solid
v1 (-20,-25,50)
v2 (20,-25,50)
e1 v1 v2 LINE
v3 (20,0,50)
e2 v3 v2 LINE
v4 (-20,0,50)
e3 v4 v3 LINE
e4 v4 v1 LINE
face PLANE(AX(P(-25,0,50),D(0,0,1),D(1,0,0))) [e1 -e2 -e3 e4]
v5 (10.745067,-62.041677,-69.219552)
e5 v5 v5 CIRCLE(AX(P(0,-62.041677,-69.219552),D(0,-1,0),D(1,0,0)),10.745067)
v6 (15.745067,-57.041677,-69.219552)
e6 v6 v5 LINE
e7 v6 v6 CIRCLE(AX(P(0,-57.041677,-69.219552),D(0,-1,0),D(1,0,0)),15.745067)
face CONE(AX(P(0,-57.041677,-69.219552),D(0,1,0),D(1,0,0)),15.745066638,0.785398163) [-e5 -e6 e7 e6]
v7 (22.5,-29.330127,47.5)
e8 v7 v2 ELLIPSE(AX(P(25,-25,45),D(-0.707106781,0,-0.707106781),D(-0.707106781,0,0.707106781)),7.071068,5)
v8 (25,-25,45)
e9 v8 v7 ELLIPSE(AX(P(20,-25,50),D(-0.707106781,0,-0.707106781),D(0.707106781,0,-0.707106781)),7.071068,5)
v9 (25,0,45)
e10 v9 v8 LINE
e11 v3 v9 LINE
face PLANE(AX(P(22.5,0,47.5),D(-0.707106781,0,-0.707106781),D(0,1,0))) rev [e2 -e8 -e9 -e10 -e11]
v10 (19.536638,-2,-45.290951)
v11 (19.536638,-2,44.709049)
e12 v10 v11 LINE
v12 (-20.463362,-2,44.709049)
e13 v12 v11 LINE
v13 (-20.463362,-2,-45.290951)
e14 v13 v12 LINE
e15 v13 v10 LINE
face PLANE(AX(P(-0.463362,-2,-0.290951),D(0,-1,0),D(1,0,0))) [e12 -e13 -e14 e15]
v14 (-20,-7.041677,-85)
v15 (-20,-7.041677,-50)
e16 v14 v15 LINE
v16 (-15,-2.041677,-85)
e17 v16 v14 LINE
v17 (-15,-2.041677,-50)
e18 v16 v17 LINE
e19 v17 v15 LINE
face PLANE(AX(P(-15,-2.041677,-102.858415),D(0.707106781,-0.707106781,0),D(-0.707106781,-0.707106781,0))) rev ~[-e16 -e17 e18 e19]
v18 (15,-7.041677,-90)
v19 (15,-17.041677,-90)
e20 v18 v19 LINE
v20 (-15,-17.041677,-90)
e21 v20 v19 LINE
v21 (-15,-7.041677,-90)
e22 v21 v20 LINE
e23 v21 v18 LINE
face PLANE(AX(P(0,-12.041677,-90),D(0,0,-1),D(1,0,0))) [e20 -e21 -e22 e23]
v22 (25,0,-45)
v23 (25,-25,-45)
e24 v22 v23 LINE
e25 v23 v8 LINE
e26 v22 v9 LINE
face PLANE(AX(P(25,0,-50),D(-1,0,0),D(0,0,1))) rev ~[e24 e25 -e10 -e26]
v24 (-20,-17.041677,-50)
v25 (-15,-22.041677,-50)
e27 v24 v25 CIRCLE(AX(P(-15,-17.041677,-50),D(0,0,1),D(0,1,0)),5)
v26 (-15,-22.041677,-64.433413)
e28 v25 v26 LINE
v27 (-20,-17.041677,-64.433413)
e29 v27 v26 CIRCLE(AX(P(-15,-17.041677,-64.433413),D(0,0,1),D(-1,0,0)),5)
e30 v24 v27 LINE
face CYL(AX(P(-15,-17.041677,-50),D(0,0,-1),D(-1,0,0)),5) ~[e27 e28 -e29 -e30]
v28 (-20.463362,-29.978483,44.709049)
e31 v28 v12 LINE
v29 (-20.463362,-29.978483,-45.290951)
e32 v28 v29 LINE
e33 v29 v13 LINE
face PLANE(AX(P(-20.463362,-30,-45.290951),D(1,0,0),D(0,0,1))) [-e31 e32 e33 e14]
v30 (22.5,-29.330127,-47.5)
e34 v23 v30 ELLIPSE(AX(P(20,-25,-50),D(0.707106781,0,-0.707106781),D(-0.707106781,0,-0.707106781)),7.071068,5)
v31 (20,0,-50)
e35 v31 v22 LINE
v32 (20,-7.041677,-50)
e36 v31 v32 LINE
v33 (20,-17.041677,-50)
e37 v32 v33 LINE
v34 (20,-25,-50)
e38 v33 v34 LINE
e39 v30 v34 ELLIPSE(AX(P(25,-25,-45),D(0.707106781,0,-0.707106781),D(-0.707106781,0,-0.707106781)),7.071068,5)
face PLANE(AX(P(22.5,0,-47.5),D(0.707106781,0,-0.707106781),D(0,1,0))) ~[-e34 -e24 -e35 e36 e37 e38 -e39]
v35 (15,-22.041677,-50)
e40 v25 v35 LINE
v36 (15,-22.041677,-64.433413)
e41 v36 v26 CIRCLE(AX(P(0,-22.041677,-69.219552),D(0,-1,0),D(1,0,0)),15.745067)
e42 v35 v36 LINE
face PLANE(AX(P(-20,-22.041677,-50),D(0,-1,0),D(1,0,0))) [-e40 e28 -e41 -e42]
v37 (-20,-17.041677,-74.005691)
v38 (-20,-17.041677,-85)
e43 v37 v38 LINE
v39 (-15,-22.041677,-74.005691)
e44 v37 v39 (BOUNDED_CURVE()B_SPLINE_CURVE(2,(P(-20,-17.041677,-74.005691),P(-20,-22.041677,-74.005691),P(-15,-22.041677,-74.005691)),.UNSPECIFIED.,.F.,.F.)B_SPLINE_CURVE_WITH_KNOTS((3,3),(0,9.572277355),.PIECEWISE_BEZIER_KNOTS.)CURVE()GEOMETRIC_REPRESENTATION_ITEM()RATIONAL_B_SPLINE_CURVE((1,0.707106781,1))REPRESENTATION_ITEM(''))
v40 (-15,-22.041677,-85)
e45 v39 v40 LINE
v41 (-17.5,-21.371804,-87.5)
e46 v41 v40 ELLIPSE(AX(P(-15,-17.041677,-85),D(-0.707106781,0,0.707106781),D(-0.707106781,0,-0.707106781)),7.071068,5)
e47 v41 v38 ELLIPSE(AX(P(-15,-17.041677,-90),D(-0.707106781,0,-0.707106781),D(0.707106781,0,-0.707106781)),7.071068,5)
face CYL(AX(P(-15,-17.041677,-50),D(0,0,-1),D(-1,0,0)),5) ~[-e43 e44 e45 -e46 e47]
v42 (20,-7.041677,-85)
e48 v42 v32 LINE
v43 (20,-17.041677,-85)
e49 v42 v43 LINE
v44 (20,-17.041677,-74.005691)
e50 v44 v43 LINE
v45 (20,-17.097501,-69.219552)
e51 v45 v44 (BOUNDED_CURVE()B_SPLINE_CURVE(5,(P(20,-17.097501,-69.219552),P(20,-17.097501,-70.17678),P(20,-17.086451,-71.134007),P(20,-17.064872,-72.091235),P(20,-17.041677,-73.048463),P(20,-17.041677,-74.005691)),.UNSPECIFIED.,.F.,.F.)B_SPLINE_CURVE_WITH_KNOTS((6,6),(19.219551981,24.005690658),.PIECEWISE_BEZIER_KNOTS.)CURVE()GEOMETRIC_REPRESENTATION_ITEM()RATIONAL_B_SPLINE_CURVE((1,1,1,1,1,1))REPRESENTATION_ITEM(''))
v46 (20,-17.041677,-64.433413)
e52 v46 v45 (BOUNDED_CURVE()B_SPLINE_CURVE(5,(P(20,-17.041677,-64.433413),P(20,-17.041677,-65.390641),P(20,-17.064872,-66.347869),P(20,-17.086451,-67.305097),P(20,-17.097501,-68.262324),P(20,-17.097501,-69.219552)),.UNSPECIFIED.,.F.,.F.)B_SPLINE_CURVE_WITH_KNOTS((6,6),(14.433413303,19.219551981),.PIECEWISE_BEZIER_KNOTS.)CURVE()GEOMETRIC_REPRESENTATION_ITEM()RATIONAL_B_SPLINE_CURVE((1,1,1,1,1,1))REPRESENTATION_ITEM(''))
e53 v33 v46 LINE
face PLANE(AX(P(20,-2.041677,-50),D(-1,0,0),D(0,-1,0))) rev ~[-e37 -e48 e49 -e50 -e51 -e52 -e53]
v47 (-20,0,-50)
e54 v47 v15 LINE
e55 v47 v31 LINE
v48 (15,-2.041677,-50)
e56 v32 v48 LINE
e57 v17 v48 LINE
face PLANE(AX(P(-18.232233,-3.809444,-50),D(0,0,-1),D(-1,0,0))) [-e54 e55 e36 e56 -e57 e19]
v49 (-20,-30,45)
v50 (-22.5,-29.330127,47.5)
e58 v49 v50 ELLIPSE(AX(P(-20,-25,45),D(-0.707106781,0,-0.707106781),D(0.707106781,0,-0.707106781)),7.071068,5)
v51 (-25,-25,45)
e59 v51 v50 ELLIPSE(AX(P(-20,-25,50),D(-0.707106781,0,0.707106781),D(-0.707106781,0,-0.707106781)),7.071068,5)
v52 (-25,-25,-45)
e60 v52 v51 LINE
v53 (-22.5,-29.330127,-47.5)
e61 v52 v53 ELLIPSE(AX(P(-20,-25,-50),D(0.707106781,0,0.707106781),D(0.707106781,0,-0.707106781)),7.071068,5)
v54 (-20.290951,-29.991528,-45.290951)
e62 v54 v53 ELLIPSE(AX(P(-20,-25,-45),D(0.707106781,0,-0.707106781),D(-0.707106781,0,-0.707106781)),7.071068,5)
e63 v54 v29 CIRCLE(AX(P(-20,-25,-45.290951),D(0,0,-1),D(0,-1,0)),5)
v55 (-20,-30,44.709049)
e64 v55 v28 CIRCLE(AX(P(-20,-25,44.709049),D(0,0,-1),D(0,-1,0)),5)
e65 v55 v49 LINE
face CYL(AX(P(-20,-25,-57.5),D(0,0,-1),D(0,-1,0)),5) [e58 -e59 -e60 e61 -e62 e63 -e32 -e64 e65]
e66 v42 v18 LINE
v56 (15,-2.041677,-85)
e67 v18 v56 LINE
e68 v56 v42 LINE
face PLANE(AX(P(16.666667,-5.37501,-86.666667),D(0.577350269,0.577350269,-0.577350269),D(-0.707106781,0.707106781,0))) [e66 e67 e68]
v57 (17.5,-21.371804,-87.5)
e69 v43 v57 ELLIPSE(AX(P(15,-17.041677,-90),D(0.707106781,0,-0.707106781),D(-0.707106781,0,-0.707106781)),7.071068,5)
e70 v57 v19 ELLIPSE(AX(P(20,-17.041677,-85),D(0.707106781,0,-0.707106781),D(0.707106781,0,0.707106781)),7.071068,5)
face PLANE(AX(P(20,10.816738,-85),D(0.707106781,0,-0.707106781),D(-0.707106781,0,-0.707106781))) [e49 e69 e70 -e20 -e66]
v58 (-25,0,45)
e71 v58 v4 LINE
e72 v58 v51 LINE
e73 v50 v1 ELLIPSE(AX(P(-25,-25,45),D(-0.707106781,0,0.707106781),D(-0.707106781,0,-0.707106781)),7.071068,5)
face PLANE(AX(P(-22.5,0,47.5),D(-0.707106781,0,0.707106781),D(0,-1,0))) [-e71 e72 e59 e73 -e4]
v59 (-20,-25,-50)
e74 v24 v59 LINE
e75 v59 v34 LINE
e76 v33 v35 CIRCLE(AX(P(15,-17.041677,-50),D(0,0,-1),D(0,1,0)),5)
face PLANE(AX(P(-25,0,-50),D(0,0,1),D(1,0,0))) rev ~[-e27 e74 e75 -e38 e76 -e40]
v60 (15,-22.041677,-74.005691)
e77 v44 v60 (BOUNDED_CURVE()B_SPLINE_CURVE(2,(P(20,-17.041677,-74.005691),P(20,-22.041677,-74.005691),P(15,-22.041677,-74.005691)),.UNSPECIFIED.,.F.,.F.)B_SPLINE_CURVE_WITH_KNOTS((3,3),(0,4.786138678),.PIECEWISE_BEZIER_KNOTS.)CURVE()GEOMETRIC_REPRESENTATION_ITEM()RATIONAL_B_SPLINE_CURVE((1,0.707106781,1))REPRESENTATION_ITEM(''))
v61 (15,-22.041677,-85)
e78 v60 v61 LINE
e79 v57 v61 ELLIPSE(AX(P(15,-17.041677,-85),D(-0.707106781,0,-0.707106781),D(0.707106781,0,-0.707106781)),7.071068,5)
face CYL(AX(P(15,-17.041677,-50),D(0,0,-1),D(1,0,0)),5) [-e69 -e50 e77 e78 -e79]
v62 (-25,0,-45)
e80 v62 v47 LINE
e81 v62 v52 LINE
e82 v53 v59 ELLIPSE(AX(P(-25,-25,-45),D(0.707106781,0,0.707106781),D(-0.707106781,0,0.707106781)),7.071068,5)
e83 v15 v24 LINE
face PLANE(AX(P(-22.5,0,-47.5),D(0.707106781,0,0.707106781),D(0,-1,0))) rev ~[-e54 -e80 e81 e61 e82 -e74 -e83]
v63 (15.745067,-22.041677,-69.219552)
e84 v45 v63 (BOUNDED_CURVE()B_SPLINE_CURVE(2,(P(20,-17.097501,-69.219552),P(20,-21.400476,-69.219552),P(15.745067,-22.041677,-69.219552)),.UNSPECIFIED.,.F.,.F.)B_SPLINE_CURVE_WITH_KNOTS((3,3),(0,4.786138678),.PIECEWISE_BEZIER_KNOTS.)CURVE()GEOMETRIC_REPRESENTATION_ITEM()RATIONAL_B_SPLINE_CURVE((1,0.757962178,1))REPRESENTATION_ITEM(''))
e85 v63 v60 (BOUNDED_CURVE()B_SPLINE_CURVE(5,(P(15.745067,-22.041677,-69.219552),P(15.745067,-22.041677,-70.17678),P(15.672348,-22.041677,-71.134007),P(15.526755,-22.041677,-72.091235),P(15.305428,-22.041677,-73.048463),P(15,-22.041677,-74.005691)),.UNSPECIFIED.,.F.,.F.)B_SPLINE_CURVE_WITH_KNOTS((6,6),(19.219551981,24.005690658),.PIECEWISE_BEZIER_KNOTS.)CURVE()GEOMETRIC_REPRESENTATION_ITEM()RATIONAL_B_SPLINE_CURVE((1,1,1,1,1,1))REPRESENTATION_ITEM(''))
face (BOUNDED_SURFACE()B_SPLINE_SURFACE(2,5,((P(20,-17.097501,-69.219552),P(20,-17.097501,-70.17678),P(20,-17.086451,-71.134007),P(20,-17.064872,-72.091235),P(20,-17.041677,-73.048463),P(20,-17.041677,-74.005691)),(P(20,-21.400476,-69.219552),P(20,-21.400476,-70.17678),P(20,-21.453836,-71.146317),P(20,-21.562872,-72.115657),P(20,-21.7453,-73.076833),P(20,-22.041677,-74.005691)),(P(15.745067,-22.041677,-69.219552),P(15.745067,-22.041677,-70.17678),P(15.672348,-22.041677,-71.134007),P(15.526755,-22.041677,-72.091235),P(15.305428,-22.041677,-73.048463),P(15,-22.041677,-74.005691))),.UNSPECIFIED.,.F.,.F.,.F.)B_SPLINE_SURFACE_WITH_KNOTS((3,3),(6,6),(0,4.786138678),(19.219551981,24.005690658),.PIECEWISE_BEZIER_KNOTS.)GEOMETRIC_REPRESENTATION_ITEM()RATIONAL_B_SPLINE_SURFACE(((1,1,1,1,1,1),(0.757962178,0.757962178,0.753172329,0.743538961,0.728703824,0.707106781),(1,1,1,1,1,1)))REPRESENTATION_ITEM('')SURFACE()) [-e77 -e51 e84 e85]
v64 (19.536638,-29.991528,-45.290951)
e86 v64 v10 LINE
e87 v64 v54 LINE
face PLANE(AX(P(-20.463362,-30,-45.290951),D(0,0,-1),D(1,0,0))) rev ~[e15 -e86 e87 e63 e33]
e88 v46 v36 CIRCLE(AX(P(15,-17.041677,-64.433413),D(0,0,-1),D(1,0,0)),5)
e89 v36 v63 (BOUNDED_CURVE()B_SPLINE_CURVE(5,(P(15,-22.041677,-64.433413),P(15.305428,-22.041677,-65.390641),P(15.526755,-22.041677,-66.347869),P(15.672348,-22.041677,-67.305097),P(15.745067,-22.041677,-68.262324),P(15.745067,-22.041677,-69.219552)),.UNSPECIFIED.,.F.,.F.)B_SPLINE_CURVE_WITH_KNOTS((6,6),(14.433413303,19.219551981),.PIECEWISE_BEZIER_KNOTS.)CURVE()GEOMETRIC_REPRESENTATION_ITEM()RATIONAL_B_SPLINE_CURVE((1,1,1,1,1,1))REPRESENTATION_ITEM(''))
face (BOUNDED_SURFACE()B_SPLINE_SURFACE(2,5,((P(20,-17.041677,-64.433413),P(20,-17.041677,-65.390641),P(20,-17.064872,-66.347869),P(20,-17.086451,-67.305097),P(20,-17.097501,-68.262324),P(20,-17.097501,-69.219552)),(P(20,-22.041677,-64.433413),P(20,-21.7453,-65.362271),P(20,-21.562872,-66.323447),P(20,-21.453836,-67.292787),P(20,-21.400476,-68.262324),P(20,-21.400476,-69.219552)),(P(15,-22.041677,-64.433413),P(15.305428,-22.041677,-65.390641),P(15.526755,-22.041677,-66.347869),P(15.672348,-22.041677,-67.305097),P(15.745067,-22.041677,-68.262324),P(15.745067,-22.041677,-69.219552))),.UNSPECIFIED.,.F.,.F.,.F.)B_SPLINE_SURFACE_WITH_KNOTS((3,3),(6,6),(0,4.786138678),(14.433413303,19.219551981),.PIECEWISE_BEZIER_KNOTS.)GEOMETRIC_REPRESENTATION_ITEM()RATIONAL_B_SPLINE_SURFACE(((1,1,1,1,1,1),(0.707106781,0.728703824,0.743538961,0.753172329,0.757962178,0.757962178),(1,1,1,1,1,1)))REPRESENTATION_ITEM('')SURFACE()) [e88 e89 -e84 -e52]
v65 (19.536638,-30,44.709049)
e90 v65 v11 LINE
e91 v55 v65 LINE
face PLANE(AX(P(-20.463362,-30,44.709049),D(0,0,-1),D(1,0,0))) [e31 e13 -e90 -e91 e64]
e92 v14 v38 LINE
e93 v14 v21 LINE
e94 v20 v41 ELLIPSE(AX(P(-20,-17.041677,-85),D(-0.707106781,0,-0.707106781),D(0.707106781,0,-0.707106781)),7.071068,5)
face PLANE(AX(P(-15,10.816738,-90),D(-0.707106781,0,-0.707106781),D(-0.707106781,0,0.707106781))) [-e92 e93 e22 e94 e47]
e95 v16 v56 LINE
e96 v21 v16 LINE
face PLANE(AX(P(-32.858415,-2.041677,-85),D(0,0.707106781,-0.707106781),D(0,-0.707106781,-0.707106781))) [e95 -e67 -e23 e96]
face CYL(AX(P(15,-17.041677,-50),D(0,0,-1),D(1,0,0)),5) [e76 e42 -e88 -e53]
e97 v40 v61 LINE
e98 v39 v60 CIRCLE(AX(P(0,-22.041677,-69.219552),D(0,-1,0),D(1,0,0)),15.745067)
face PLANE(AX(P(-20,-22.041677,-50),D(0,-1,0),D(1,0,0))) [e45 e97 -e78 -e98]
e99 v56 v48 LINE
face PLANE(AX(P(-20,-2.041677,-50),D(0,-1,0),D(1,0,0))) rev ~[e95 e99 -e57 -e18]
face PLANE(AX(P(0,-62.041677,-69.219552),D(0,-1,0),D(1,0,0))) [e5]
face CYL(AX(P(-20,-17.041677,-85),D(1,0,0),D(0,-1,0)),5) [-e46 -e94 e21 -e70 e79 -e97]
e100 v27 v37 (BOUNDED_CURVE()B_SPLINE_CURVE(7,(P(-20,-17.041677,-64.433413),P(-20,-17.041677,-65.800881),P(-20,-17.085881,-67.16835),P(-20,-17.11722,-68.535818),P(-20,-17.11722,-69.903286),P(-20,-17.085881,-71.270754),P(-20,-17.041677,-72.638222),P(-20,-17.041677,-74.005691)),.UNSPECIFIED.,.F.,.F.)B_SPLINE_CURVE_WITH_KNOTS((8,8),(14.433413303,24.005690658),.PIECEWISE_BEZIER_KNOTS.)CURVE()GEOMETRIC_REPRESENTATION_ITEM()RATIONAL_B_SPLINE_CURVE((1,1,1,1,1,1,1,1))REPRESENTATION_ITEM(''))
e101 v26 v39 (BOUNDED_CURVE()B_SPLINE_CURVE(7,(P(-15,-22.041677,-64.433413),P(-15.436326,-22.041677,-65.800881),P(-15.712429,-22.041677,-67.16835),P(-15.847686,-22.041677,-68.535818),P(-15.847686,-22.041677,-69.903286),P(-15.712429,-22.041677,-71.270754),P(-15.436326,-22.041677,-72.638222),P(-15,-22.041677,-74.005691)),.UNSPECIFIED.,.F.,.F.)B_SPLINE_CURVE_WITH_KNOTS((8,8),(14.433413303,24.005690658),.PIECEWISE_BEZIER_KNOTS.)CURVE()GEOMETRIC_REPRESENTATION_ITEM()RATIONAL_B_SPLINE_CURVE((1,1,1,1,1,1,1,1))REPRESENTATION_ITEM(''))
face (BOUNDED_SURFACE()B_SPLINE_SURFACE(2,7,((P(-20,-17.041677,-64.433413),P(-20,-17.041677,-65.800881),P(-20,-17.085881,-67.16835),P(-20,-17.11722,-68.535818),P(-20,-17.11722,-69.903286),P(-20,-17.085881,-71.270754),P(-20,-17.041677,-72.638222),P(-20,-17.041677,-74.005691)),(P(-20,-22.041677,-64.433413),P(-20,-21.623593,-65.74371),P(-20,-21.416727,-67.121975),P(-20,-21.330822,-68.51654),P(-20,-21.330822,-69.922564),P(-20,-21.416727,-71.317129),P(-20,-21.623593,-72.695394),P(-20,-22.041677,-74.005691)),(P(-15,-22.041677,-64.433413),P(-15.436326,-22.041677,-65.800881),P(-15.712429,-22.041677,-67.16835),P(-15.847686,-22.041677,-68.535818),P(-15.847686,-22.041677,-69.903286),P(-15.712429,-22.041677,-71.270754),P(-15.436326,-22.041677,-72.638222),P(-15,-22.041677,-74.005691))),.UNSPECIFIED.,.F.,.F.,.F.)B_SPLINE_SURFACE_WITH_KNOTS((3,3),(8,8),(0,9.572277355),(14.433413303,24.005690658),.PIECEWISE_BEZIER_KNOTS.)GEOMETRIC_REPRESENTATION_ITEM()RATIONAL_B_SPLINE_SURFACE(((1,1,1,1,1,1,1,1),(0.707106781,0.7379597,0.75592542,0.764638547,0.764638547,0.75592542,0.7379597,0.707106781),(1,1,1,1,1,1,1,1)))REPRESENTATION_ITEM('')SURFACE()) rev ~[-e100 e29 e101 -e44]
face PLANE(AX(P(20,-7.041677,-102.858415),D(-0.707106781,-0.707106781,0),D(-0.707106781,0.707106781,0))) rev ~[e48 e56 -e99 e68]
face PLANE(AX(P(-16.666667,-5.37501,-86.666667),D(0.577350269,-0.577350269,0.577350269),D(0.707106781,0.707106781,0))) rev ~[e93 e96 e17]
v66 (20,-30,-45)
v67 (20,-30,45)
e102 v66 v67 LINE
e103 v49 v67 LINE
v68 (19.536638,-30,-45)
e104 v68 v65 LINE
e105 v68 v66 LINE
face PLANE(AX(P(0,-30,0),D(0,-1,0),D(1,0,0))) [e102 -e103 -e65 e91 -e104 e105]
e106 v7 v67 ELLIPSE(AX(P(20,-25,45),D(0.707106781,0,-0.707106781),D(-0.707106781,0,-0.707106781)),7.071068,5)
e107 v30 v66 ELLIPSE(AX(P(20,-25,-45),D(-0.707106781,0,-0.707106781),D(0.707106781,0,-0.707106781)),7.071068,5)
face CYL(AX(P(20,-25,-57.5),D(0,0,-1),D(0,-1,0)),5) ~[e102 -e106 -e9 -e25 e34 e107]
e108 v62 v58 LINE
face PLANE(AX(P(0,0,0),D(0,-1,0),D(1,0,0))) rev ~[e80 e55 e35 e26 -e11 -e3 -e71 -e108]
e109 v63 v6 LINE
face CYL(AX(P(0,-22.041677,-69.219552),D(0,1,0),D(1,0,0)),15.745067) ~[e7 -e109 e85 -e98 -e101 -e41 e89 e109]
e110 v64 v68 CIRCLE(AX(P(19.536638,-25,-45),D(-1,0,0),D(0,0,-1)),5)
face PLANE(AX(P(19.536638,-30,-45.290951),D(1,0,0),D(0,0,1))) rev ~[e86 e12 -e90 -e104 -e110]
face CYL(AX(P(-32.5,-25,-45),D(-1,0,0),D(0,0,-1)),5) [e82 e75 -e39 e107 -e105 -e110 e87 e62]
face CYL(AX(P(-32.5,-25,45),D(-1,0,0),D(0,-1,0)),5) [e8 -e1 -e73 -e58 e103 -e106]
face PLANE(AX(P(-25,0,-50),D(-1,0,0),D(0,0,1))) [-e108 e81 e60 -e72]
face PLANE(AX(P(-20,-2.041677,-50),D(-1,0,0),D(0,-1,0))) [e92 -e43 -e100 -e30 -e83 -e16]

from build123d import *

# Parameters (mm, degrees)
F1_W         = 50
F1_H         = 100
F2_DEPTH     = 30
F4_W         = 40
F4_H         = 90
F5_DEPTH     = 28
F6_SIZE      = 5
F7_T1_DEPTH  = 115
F7_T3_DEPTH  = 65
F8_W         = 40
F8_H         = 20
F9_DEPTH     = 40
F10_R        = 15.7450666382
F11_DEPTH    = 40
F12_R        = 5
F13_T1_DEPTH = 6.3508529611
F13_T3_DEPTH = 6.3508529611
F13_T5_DEPTH = 40.7168298797
F13_T7_DEPTH = 65.7168298797
F13_T9_DEPTH = 52.8584149398


# Not quite as in the source:
# - a fillet or chamfer that OpenCascade refuses, or shapes differently, is made with other operations: its cross-section is extruded or revolved along the edge and cut away or added


with BuildPart() as f2:
    # F1 (on face) → F2 (new body)
    with BuildSketch(Plane.XZ):
        Rectangle(F1_W, F1_H)
    extrude(amount=F2_DEPTH)

    # F4 (on face) → F5 (cut)
    with BuildSketch(Plane.XZ.offset(30)):
        with Locations((-0.4633623362, -0.2909506857)):
            Rectangle(F4_W, F4_H)
    extrude(amount=-F5_DEPTH, mode=Mode.SUBTRACT)

    # F6
    f6_edges = [f2.edges().sort_by_distance(p)[0] for p in [
        (25, -15, 50),
        (-25, -15, 50),
        (-25, -15, -50),
        (25, -15, -50),
    ]]
    chamfer(f6_edges, length=F6_SIZE)

    # F7: fillet of radius 5 on 4 edges, made by hand

    # F7_s2 → F7_t1 (cut)
    with BuildSketch(Plane.XY.offset(-57.5)):
        with BuildLine():
            ThreePointArc((-20, -30), (-23.5355339059, -28.5355339059), (-25, -25))
            Line((-25, -25), (-25, -30))
            Line((-25, -30), (-20, -30))
        make_face()
        with BuildLine():
            ThreePointArc((20, -30), (23.5355339059, -28.5355339059), (25, -25))
            Line((25, -25), (25, -30))
            Line((25, -30), (20, -30))
        make_face()
    extrude(amount=F7_T1_DEPTH, mode=Mode.SUBTRACT)

    # F7_s4 → F7_t3 (cut)
    with BuildSketch(Plane.YZ.offset(-32.5)):
        with BuildLine():
            ThreePointArc((-30, 45), (-28.5355339059, 48.5355339059), (-25, 50))
            Line((-25, 50), (-30, 50))
            Line((-30, 50), (-30, 45))
        make_face()
        with BuildLine():
            ThreePointArc((-25, -50), (-28.5355339059, -48.5355339059), (-30, -45))
            Line((-30, -45), (-30, -50))
            Line((-30, -50), (-25, -50))
        make_face()
    extrude(amount=F7_T3_DEPTH, mode=Mode.SUBTRACT)

    # F8 (on face) → F9 (join)
    with BuildSketch(Plane(origin=(0, 0, -50), x_dir=(1, 0, 0), z_dir=(0, 0, -1))):
        with Locations((0, 12.041676566)):
            Rectangle(F8_W, F8_H)
    extrude(amount=F9_DEPTH)

    # F10 (on face) → F11 (join)
    with BuildSketch(Plane.XZ.offset(22.041676566)):
        with Locations((0, -69.2195519805)):
            Circle(F10_R)
    extrude(amount=F11_DEPTH)

    # F12
    f12_edges = [f2.edges().sort_by_distance(p)[0] for p in [
        (-20, -22.041677, -70),
        (20, -22.041677, -70),
        (0, -22.041677, -90),
    ]]
    fillet(f12_edges, radius=F12_R)

    # F13: chamfer of 5 on 7 edges, made by hand

    # F13_s2 → F13_t1 (cut)
    with BuildSketch(Plane(origin=(-32.652774478, 32.652774478, -32.652774478), x_dir=(-0.7071067812, -0.7071067812, 0), z_dir=(-0.5773502692, 0.5773502692, -0.5773502692))):
        Polygon((12.0502850626, -64.1119959897), (19.1213528745, -64.1119959897), (15.5858189685, -70.2357203466), align=None)
    extrude(amount=F13_T1_DEPTH, mode=Mode.SUBTRACT)

    # F13_s4 → F13_t3 (cut)
    with BuildSketch(Plane(origin=(32.652774478, 32.652774478, -32.652774478), x_dir=(-0.7071067812, 0.7071067812, 0), z_dir=(0.5773502692, 0.5773502692, -0.5773502692))):
        Polygon((-19.1213528745, -64.1119959897), (-15.5858189685, -70.2357203466), (-12.0502850626, -64.1119959897), align=None)
    extrude(amount=F13_T3_DEPTH, mode=Mode.SUBTRACT)

    # F13_s6 → F13_t5 (cut)
    with BuildSketch(Plane.XZ.offset(-10.8167383738)):
        Polygon((-15, -90), (-20, -85), (-20, -90), align=None)
        Polygon((20, -85), (15, -90), (20, -90), align=None)
    extrude(amount=F13_T5_DEPTH, mode=Mode.SUBTRACT)

    # F13_s8 → F13_t7 (cut)
    with BuildSketch(Plane.YZ.offset(-32.8584149398)):
        Polygon((-2.041676566, -85), (-7.041676566, -90), (-2.041676566, -90), align=None)
    extrude(amount=F13_T7_DEPTH, mode=Mode.SUBTRACT)

    # F13_s10 → F13_t9 (cut)
    with BuildSketch(Plane.XY.offset(-102.8584149398)):
        Polygon((20, -7.041676566), (15, -2.041676566), (20, -2.041676566), align=None)
        Polygon((-15, -2.041676566), (-20, -7.041676566), (-20, -2.041676566), align=None)
    extrude(amount=F13_T9_DEPTH, mode=Mode.SUBTRACT)

    # F13_s11 → F13_t12 (revolve, cut)
    with BuildSketch(Plane.XY.offset(-69.2195519805)):
        Polygon((15.7450666382, -57.041676566), (10.7450666382, -62.041676566), (15.7450666382, -62.041676566), align=None)
    revolve(axis=Axis((0, -62.041676566, -69.2195519805), (0, -1, 0)), mode=Mode.SUBTRACT)


solid = f2.part
